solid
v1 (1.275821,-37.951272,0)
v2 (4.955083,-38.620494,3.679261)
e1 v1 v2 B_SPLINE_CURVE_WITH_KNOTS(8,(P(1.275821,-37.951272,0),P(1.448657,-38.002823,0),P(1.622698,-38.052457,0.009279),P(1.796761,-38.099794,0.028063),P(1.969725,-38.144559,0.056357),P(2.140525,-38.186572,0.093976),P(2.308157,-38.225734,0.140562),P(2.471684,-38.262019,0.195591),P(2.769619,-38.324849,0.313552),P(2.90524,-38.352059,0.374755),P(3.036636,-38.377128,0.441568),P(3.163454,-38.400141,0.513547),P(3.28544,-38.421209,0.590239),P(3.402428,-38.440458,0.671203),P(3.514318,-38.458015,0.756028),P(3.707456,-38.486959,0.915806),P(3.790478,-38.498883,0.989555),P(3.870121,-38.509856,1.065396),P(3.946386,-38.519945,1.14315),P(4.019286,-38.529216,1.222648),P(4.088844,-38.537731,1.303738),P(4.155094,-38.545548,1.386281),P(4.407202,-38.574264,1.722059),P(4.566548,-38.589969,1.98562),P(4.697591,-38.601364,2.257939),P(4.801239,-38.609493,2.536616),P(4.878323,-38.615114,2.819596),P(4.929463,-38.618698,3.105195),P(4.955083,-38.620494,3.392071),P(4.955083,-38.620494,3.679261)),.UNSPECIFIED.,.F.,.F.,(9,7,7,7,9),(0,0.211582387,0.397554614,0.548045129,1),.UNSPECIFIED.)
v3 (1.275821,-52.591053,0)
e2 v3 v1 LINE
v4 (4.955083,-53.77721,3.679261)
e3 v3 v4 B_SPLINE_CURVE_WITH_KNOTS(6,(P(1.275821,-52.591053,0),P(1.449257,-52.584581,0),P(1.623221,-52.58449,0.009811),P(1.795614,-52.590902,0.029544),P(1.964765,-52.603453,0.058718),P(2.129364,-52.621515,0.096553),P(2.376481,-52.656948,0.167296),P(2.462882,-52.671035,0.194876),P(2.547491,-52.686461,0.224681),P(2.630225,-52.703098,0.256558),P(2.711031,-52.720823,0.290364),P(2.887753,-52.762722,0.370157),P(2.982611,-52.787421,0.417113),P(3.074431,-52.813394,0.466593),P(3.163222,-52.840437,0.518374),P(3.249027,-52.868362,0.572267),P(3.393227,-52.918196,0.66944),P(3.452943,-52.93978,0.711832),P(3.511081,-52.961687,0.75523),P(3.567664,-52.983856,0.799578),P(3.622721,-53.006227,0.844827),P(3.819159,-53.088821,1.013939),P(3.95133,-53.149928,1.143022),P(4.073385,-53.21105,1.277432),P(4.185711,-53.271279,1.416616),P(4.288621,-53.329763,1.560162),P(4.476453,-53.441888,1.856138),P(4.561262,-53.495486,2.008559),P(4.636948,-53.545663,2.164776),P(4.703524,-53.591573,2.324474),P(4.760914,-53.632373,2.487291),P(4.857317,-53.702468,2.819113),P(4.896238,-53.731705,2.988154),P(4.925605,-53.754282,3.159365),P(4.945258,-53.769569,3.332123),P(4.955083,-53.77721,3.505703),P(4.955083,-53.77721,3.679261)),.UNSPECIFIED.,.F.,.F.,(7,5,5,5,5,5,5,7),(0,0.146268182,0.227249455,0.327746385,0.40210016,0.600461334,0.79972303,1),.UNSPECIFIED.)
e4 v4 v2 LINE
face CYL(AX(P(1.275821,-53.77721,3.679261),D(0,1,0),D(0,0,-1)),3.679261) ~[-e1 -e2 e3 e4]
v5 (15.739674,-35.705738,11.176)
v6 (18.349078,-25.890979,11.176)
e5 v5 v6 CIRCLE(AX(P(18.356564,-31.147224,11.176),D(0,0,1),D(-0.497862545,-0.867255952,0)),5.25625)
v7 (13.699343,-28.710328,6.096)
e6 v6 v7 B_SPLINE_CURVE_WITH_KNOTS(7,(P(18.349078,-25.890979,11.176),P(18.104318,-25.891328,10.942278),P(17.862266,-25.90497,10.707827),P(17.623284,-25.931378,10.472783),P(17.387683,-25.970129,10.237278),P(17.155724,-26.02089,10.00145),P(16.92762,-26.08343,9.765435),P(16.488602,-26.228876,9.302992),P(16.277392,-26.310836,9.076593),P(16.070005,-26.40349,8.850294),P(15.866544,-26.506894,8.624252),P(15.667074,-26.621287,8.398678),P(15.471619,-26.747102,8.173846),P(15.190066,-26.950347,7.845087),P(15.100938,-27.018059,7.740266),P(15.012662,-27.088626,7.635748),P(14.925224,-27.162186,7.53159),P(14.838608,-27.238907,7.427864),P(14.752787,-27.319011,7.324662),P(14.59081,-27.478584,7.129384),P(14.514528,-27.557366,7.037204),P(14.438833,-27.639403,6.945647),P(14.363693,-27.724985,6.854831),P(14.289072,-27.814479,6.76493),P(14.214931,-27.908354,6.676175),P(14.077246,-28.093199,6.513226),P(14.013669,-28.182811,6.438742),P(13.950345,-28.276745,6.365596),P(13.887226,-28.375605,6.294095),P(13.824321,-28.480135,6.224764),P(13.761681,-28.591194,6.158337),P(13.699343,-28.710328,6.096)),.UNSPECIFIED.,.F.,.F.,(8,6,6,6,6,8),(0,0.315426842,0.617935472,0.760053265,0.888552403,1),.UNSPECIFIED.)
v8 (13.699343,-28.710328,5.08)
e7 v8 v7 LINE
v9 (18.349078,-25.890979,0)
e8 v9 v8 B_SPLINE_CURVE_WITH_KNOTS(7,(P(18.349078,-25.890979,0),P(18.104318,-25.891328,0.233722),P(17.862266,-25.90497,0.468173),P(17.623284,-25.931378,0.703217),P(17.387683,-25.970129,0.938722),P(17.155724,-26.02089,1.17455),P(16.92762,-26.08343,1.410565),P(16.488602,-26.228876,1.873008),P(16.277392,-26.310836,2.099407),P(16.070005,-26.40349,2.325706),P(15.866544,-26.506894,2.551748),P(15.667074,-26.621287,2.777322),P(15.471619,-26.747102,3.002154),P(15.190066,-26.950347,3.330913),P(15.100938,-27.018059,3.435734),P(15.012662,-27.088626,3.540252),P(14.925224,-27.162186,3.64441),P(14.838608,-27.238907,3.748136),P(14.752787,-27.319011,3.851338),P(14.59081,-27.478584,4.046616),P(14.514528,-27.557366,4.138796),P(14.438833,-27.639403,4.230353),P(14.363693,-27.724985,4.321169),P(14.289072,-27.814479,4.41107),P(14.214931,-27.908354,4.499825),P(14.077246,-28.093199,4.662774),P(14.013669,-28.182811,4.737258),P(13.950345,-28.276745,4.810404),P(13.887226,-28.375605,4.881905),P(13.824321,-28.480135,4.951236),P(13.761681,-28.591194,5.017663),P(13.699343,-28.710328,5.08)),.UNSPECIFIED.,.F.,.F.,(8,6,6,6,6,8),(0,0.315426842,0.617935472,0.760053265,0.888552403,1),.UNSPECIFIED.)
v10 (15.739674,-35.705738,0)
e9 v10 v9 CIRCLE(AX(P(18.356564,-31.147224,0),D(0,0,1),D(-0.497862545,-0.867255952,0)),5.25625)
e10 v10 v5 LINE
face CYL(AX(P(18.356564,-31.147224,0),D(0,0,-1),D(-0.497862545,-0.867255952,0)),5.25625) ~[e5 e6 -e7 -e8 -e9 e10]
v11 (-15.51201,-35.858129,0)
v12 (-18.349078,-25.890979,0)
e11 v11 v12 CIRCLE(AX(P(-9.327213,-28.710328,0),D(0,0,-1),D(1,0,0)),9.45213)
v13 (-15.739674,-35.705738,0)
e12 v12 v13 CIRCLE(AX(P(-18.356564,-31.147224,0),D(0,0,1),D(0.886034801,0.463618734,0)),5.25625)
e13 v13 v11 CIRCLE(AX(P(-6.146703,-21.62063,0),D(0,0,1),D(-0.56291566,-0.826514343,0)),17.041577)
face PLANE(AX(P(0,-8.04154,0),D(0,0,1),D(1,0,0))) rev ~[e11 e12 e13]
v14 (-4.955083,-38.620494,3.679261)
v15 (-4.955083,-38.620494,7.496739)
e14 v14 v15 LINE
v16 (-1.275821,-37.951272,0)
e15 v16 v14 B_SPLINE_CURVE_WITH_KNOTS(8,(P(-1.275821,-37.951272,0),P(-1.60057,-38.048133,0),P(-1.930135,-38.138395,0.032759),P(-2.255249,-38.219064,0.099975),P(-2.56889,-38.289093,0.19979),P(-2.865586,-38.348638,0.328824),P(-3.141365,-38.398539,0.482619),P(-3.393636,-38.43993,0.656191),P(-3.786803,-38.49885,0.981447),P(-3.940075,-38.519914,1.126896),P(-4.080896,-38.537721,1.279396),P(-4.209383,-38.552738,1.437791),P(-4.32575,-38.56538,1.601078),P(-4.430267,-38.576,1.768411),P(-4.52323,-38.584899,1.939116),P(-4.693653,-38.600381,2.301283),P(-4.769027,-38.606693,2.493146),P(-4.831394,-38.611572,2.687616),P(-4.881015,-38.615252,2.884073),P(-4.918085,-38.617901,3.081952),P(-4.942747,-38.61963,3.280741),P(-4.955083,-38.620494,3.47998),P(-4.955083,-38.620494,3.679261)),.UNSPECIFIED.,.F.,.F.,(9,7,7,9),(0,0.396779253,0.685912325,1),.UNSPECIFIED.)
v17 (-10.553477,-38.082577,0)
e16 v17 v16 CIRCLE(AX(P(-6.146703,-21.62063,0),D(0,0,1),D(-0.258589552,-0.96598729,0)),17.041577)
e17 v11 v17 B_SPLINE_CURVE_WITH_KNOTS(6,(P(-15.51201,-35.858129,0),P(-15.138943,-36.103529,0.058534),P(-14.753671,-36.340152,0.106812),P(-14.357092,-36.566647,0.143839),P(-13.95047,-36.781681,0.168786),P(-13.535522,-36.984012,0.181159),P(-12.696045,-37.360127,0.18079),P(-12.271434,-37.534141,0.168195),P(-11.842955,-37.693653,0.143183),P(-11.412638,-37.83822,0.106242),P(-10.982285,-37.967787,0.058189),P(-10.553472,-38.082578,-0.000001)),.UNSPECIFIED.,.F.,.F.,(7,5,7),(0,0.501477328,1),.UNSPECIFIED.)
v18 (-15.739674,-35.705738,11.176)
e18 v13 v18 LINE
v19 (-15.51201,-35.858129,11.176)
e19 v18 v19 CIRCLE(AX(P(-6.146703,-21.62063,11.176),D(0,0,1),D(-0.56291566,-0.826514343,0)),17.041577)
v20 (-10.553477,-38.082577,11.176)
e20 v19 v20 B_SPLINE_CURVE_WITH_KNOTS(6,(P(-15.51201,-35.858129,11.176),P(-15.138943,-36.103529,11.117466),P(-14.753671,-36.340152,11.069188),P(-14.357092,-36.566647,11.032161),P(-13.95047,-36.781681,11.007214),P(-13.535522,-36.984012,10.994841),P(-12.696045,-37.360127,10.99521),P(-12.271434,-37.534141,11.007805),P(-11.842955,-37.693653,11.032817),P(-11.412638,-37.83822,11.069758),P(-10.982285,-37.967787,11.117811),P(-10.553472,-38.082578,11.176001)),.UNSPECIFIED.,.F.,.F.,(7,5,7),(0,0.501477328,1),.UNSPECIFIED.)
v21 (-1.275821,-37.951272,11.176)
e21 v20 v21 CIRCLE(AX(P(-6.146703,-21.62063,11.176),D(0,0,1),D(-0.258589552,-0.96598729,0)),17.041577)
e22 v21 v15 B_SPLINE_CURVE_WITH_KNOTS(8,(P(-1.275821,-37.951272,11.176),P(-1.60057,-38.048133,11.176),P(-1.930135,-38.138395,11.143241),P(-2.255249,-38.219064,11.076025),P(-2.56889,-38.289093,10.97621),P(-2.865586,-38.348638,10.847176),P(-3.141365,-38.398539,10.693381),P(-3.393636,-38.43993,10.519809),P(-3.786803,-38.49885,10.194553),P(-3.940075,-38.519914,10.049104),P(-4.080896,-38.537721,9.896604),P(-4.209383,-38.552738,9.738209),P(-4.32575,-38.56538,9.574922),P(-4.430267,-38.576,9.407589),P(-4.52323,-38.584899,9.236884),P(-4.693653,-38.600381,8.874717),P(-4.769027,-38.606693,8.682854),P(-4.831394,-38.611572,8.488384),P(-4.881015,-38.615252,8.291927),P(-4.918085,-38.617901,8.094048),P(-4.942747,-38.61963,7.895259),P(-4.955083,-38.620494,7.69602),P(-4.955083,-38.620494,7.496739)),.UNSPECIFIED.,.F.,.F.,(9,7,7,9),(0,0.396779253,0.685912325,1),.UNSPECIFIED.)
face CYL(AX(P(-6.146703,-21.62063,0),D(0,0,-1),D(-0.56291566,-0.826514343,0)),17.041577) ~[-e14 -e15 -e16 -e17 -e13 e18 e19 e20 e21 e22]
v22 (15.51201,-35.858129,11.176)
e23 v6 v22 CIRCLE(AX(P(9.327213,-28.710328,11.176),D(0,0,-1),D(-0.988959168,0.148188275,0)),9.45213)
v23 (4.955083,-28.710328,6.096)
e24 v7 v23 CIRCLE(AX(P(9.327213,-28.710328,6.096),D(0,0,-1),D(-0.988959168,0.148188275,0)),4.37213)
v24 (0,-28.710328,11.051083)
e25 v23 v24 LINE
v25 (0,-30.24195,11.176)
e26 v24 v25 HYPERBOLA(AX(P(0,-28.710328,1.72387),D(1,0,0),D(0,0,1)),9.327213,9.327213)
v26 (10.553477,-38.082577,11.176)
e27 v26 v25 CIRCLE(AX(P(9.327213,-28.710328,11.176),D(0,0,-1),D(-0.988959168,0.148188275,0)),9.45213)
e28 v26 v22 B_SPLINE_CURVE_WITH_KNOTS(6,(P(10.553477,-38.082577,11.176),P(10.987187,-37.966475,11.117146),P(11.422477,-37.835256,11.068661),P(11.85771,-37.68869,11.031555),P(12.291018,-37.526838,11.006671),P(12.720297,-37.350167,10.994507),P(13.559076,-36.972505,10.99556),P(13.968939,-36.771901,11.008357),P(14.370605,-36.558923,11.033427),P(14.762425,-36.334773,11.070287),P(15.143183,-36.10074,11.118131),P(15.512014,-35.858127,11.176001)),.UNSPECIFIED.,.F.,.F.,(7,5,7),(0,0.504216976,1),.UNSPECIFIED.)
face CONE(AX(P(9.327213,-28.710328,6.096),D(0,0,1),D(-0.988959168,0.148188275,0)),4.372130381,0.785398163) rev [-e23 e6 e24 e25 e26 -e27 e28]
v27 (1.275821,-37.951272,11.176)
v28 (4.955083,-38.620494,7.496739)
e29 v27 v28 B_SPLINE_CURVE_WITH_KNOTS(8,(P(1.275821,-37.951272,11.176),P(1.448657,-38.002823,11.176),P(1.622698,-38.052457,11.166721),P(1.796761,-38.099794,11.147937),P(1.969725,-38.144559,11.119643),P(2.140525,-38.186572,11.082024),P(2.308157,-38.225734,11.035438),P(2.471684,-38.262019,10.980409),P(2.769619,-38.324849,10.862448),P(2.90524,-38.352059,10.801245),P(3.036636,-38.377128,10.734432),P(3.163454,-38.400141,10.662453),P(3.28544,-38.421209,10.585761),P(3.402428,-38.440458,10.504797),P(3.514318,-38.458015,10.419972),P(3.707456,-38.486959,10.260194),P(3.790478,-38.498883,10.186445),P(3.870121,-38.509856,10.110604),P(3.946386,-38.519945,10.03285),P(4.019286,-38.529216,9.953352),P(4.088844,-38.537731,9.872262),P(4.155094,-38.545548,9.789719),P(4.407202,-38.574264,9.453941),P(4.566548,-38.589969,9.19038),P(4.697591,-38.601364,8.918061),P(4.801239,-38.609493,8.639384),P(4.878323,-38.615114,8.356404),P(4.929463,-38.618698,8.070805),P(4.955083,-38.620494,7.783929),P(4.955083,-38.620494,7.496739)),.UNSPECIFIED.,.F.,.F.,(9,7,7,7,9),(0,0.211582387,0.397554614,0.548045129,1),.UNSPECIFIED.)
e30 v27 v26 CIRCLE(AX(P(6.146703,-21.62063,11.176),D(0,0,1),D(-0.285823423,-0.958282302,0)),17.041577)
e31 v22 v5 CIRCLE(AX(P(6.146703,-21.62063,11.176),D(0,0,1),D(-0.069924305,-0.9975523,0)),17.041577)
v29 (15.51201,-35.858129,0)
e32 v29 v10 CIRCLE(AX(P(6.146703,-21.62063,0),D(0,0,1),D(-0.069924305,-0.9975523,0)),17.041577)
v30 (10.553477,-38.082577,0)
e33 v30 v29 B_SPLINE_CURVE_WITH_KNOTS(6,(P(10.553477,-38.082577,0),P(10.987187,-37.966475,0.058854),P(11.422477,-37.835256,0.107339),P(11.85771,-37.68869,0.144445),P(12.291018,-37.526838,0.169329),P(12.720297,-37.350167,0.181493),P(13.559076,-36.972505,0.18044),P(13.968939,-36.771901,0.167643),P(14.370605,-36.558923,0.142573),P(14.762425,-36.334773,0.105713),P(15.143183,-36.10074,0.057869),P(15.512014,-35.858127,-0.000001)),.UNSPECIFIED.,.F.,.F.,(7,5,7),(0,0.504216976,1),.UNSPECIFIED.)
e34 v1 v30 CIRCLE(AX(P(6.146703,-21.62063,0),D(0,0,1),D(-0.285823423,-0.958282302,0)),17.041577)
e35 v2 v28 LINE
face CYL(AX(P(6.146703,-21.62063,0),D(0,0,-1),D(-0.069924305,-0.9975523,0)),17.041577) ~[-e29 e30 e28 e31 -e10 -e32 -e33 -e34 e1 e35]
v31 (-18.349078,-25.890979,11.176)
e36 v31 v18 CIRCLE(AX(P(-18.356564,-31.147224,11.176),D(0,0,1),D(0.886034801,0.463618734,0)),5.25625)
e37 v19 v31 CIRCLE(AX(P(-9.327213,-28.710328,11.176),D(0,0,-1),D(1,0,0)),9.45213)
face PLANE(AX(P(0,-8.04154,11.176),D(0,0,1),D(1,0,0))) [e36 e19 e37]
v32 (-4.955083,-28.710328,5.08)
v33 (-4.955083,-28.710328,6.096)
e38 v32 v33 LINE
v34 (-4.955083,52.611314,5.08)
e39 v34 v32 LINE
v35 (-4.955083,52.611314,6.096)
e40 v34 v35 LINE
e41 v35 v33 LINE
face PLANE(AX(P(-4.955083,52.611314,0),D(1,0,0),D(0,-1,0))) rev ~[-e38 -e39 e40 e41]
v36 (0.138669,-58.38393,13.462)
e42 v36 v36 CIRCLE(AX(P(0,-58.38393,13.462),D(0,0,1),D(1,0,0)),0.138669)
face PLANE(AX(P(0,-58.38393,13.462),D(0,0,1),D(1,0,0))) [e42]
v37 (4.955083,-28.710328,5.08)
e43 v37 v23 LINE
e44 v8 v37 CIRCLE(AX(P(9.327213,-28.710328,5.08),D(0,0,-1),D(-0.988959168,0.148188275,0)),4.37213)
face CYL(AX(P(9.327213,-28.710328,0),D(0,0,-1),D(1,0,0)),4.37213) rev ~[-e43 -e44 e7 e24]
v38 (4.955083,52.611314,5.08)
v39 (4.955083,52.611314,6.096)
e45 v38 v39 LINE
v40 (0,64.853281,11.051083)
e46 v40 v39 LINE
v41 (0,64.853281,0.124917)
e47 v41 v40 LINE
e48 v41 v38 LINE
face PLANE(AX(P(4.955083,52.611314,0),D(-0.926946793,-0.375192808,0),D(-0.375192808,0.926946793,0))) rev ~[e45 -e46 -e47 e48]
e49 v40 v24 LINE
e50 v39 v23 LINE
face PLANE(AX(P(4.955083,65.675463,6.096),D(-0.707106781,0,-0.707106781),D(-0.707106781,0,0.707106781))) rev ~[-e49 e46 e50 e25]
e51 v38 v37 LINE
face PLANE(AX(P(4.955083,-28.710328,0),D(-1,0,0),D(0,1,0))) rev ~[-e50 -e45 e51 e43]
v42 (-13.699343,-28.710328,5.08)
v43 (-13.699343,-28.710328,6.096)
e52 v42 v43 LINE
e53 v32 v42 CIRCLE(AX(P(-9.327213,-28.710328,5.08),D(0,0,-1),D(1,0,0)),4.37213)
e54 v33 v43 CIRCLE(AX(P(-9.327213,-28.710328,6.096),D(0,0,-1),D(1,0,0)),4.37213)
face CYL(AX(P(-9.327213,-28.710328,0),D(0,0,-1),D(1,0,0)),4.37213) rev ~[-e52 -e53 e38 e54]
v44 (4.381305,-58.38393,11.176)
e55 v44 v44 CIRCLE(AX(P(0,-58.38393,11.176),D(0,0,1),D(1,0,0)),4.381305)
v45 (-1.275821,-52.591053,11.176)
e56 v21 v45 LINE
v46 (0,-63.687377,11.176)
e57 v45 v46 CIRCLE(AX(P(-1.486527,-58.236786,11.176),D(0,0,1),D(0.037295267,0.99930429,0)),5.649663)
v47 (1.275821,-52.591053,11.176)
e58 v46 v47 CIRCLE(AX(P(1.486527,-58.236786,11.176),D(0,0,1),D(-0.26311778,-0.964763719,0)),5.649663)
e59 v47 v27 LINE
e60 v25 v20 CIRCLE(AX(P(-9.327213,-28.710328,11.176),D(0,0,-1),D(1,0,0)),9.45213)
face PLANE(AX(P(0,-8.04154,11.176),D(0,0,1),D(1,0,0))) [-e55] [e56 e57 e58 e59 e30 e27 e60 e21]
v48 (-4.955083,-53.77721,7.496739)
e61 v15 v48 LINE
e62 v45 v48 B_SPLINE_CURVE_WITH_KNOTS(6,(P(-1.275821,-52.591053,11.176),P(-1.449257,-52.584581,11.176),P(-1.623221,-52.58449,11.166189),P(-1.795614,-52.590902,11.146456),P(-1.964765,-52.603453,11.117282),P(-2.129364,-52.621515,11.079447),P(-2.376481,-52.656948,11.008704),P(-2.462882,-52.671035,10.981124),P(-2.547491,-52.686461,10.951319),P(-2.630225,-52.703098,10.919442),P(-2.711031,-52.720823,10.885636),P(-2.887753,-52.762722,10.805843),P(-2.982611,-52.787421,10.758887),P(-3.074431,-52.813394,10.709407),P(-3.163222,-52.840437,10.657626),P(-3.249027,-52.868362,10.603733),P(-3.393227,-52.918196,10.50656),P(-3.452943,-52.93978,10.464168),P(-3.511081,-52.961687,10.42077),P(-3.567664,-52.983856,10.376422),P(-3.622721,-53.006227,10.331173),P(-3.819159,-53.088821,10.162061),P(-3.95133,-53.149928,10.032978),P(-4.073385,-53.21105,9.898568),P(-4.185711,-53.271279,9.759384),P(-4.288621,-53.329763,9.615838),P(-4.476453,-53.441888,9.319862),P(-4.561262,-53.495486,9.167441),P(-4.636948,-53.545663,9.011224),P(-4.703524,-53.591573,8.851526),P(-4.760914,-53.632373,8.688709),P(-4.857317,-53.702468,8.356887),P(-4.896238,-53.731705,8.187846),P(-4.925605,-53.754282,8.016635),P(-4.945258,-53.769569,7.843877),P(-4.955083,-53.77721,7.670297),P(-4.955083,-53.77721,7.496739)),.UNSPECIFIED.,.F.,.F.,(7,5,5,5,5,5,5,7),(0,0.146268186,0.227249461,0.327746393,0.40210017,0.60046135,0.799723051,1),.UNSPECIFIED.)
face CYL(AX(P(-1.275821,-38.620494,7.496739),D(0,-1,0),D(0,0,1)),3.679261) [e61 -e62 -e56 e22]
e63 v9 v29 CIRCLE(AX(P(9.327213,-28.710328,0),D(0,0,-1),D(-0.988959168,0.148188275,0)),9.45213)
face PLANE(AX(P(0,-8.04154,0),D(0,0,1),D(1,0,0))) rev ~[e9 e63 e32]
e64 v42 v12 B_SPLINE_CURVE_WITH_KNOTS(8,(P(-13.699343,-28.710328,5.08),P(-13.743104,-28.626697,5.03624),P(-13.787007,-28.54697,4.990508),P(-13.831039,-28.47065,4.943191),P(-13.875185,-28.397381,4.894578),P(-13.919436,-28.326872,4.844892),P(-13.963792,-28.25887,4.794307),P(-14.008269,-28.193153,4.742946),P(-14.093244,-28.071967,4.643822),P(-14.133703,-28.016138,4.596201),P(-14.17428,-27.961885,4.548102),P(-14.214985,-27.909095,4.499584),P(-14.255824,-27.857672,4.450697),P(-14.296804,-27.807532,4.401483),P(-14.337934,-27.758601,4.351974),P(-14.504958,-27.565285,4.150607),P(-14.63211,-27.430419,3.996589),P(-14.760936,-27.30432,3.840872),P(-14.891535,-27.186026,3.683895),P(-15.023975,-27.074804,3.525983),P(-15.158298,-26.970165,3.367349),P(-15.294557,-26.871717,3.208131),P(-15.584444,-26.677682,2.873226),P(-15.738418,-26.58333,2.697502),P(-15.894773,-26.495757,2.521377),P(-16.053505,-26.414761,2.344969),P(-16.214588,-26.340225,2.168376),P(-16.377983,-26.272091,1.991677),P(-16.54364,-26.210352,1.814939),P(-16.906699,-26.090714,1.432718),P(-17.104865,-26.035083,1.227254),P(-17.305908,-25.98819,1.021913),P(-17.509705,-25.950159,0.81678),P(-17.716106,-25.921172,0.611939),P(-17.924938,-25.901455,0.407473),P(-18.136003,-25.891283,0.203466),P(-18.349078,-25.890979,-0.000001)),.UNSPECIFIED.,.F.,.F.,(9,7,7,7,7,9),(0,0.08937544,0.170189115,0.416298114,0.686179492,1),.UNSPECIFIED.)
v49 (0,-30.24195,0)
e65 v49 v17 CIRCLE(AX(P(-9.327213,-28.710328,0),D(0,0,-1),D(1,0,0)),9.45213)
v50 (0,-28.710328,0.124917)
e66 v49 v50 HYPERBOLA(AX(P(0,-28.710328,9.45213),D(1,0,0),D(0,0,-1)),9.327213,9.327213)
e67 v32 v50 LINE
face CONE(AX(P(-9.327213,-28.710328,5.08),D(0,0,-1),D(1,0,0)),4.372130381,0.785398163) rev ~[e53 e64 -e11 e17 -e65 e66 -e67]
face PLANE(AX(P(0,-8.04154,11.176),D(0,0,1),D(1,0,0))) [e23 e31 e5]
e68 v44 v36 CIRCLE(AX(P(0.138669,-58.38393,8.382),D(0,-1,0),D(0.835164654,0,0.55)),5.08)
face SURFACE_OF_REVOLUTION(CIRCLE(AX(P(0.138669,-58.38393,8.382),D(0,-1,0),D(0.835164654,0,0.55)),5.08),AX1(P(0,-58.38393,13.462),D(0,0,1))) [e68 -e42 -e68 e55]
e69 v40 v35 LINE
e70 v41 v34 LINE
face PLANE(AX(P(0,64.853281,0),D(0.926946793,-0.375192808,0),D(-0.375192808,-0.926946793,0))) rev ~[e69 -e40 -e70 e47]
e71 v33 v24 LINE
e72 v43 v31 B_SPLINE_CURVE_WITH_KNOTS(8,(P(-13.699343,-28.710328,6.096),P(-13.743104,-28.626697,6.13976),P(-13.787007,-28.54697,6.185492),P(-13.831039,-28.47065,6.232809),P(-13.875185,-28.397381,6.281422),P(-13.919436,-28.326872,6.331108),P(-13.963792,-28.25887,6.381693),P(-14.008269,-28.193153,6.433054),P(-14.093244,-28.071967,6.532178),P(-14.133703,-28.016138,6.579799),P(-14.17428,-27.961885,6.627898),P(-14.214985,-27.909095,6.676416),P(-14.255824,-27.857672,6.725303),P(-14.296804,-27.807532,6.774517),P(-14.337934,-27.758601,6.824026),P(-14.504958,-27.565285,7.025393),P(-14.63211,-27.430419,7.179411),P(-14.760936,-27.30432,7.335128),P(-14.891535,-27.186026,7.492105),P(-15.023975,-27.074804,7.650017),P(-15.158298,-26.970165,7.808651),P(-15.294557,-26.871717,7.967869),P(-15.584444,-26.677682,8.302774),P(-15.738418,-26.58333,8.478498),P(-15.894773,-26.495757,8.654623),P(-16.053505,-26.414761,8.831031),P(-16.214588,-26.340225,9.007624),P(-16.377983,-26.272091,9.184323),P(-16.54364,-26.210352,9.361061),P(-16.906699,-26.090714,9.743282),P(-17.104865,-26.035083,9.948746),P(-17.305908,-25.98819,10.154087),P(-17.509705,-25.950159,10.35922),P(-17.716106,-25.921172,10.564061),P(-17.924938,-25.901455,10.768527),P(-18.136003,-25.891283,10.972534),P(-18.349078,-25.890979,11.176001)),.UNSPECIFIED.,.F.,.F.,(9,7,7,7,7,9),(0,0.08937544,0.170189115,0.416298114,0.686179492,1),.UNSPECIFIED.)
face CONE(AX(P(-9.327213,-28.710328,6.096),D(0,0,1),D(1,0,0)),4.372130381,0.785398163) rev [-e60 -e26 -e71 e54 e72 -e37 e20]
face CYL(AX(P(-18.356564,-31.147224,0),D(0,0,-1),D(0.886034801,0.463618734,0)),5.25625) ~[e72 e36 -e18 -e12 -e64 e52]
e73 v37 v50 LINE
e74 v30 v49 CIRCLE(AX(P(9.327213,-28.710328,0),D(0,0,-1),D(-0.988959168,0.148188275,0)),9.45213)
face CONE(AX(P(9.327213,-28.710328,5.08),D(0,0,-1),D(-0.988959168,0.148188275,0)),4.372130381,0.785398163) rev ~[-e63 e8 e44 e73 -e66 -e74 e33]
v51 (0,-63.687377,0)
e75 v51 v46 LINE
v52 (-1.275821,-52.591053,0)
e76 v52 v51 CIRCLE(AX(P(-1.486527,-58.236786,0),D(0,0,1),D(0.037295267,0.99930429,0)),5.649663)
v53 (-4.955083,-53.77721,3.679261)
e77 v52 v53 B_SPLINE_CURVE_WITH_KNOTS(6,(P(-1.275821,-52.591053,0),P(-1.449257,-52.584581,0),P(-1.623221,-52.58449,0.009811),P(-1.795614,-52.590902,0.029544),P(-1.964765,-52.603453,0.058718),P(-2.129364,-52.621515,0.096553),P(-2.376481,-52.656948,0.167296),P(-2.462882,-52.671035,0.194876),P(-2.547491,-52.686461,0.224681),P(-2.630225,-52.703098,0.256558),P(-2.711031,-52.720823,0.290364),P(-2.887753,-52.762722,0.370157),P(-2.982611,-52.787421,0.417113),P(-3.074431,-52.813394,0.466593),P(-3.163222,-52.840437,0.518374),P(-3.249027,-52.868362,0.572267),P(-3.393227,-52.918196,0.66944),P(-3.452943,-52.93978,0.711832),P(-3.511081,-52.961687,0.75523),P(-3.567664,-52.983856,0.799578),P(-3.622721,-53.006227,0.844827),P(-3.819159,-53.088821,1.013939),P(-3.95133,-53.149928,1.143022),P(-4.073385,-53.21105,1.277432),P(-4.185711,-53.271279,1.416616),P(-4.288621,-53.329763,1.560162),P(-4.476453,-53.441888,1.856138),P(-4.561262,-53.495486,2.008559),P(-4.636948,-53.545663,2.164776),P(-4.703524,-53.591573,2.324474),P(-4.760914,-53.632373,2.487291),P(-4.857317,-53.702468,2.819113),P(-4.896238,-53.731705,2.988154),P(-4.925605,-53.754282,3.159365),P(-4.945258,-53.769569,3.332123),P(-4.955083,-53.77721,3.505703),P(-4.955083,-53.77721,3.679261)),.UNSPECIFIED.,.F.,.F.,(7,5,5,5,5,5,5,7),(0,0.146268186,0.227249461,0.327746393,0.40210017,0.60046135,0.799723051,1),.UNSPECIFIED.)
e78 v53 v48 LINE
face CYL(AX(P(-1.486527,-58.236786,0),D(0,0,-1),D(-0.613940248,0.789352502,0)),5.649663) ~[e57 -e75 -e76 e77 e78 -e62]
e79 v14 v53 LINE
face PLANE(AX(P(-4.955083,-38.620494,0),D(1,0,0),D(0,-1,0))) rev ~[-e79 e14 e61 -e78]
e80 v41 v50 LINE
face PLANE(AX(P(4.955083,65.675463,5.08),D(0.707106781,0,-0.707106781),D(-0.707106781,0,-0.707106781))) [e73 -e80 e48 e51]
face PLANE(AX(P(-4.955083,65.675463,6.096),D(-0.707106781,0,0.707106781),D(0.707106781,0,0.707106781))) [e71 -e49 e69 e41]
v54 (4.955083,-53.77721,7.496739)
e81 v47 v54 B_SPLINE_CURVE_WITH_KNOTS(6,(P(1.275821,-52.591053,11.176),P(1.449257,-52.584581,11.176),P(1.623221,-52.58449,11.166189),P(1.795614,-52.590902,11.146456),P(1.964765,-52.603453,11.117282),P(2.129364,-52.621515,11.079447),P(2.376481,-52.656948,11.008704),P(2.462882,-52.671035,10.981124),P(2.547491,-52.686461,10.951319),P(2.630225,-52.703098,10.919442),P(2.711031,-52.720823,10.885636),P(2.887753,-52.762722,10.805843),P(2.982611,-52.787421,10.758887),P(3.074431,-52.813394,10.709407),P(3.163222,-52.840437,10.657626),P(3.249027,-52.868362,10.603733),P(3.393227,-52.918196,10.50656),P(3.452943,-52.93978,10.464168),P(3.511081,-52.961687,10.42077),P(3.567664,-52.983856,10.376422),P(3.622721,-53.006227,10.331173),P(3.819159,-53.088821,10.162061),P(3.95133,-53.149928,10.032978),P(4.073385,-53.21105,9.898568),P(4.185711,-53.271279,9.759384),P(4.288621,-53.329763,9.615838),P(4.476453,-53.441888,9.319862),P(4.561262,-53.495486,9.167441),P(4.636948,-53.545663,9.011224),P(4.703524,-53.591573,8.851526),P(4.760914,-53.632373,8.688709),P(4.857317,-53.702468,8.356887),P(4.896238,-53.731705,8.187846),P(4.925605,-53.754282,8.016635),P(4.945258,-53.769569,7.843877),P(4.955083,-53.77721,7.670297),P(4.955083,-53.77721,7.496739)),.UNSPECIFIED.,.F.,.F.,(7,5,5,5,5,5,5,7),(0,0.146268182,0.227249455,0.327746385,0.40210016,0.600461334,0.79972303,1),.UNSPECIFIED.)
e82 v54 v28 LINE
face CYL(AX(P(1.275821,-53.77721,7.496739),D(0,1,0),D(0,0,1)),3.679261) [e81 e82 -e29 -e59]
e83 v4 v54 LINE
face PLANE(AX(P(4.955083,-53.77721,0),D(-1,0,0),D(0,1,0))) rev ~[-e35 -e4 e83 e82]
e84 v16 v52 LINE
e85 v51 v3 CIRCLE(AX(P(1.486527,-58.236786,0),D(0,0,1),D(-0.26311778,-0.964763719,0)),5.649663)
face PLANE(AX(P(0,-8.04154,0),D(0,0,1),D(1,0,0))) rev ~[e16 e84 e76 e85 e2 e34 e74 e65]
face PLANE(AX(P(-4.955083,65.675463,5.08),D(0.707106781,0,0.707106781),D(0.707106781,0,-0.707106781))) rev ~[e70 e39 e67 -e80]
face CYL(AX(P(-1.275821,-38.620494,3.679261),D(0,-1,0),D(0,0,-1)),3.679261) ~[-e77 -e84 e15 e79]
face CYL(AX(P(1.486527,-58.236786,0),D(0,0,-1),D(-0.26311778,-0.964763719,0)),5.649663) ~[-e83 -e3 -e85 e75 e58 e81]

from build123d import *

# Parameters (mm, degrees)
F1_DEPTH     = 11.176
F2_T1_DEPTH  = 94.3857913817
F2_T4_ANGLE  = 351.4780510153
F2_T6_ANGLE  = 351.4780510153
F2_T8_ANGLE  = 351.4780510153
F2_T10_ANGLE = 351.4780510153
F3_R         = 3.6792614691
F4_R         = 3.6792614691
F5_R         = 4.3813050742
F6_DEPTH     = 2.286


# Not quite as in the source:
# - a fillet or chamfer that OpenCascade refuses, or shapes differently, is made with other operations: its cross-section is extruded or revolved along the edge and cut away or added


with BuildPart() as f1:
    # F0 (on Top) → F1 (new body)
    with BuildSketch(Plane.XY):
        with BuildLine():
            Line((4.9550826661, 52.6113137603), (0, 64.8532807827))
            Line((0, 64.8532807827), (-4.9550826661, 52.6113137603))
            Line((-4.9550826661, 52.6113137603), (-4.9550826661, -28.7103280425))
            ThreePointArc((-4.9550826661, -28.7103280425), (-9.3272130471, -33.0824584235), (-13.699343428, -28.7103280425))
            ThreePointArc((-13.699343428, -28.7103280425), (-23.4025628963, -29.6754723169), (-15.7396737486, -35.7057377696))
            ThreePointArc((-15.7396737486, -35.7057377696), (-10.5930074953, -38.0719437204), (-4.9550826661, -38.6204943061))
            Line((-4.9550826661, -38.6204943061), (-4.9550826661, -53.7772104144))
            ThreePointArc((-4.9550826661, -53.7772104144), (-6.5397395867, -60.7633924821), (0, -63.687376678))
            ThreePointArc((0, -63.687376678), (6.5397395867, -60.7633924821), (4.9550826661, -53.7772104144))
            Line((4.9550826661, -53.7772104144), (4.9550826661, -38.6204943061))
            ThreePointArc((4.9550826661, -38.6204943061), (10.5930074953, -38.0719437204), (15.7396737486, -35.7057377696))
            ThreePointArc((15.7396737486, -35.7057377696), (23.4025628963, -29.6754723169), (13.699343428, -28.7103280425))
            ThreePointArc((13.699343428, -28.7103280425), (9.3272130471, -33.0824584235), (4.9550826661, -28.7103280425))
            Line((4.9550826661, -28.7103280425), (4.9550826661, 52.6113137603))
        make_face()
    extrude(amount=F1_DEPTH)

    # F2: chamfer of 5.08 on 8 edges, made by hand

    # F2_s2 → F2_t1 (cut)
    with BuildSketch(Plane.XZ.offset(-65.6754633391)):
        Polygon((-4.9550826661, 6.096), (0.1249173339, 11.176), (-4.9550826661, 11.176), align=None)
        Polygon((4.9550826661, 6.096), (-0.1249173339, 11.176), (4.9550826661, 11.176), align=None)
        Polygon((-4.9550826661, 5.08), (0.1249173339, 0), (-4.9550826661, 0), align=None)
        Polygon((4.9550826661, 5.08), (-0.1249173339, 0), (4.9550826661, 0), align=None)
    extrude(amount=F2_T1_DEPTH, mode=Mode.SUBTRACT)

    # F2_s3 → F2_t4 (revolve, cut)
    with BuildSketch(Plane(origin=(-4.0027369728, -26.7129328444, 0), x_dir=(0, 0, 1), z_dir=(-0.1481882745, -0.9889591677, 0))):
        Polygon((5.08, -9.1066364436), (0, -4.0266364436), (0, -9.1066364436), align=None)
    revolve(axis=Axis((9.3272130471, -28.7103280425, 0), (0, 0, -1)), revolution_arc=F2_T4_ANGLE, mode=Mode.SUBTRACT)

    # F2_s5 → F2_t6 (revolve, cut)
    with BuildSketch(Plane(origin=(-4.0027369728, -26.7129328444, 0), x_dir=(0, 0, 1), z_dir=(-0.1481882745, -0.9889591677, 0))):
        Polygon((6.096, -9.1066364436), (11.176, -4.0266364436), (11.176, -9.1066364436), align=None)
    revolve(axis=Axis((9.3272130471, -28.7103280425, 11.176), (0, 0, -1)), revolution_arc=F2_T6_ANGLE, mode=Mode.SUBTRACT)

    # F2_s7 → F2_t8 (revolve, cut)
    with BuildSketch(Plane.XZ.offset(28.7103280425)):
        Polygon((-4.9550826661, 5.08), (0.1249173339, 0), (-4.9550826661, 0), align=None)
    revolve(axis=Axis((-9.3272130471, -28.7103280425, 0), (0, 0, -1)), revolution_arc=F2_T8_ANGLE, mode=Mode.SUBTRACT)

    # F2_s9 → F2_t10 (revolve, cut)
    with BuildSketch(Plane.XZ.offset(28.7103280425)):
        Polygon((-4.9550826661, 6.096), (0.1249173339, 11.176), (-4.9550826661, 11.176), align=None)
    revolve(axis=Axis((-9.3272130471, -28.7103280425, 11.176), (0, 0, -1)), revolution_arc=F2_T10_ANGLE, mode=Mode.SUBTRACT)

    # F3
    f3_edges = [f1.edges().sort_by_distance(p)[0] for p in [
        (-4.955083, -46.198852, 11.176),
    ]]
    fillet(f3_edges, radius=F3_R)

    # F4
    f4_edges = [f1.edges().sort_by_distance(p)[0] for p in [
        (4.955083, -46.198852, 11.176),
        (4.955083, -46.198852, 0),
        (-4.955083, -46.198852, 0),
    ]]
    fillet(f4_edges, radius=F4_R)

    # F5 (on face) → F6 (join)
    with BuildSketch(Plane.XY.offset(11.176)):
        with Locations((0, -58.3839304745)):
            Circle(F5_R)
    extrude(amount=F6_DEPTH)

    # F7: fillet of radius 5.08 on 1 edges, made by hand

    # F7_s1 → F7_t2 (revolve, cut)
    with BuildSketch(Plane.XZ.offset(58.3839304745)):
        with BuildLine():
            ThreePointArc((4.3813050742, 11.176), (2.5483242068, 12.8541314829), (0.1386686298, 13.462))
            Line((0.1386686298, 13.462), (4.3813050742, 13.462))
            Line((4.3813050742, 13.462), (4.3813050742, 11.176))
        make_face()
    revolve(axis=Axis((0, -58.3839304745, 13.462), (0, 0, 1)), mode=Mode.SUBTRACT)


solid = f1.part
